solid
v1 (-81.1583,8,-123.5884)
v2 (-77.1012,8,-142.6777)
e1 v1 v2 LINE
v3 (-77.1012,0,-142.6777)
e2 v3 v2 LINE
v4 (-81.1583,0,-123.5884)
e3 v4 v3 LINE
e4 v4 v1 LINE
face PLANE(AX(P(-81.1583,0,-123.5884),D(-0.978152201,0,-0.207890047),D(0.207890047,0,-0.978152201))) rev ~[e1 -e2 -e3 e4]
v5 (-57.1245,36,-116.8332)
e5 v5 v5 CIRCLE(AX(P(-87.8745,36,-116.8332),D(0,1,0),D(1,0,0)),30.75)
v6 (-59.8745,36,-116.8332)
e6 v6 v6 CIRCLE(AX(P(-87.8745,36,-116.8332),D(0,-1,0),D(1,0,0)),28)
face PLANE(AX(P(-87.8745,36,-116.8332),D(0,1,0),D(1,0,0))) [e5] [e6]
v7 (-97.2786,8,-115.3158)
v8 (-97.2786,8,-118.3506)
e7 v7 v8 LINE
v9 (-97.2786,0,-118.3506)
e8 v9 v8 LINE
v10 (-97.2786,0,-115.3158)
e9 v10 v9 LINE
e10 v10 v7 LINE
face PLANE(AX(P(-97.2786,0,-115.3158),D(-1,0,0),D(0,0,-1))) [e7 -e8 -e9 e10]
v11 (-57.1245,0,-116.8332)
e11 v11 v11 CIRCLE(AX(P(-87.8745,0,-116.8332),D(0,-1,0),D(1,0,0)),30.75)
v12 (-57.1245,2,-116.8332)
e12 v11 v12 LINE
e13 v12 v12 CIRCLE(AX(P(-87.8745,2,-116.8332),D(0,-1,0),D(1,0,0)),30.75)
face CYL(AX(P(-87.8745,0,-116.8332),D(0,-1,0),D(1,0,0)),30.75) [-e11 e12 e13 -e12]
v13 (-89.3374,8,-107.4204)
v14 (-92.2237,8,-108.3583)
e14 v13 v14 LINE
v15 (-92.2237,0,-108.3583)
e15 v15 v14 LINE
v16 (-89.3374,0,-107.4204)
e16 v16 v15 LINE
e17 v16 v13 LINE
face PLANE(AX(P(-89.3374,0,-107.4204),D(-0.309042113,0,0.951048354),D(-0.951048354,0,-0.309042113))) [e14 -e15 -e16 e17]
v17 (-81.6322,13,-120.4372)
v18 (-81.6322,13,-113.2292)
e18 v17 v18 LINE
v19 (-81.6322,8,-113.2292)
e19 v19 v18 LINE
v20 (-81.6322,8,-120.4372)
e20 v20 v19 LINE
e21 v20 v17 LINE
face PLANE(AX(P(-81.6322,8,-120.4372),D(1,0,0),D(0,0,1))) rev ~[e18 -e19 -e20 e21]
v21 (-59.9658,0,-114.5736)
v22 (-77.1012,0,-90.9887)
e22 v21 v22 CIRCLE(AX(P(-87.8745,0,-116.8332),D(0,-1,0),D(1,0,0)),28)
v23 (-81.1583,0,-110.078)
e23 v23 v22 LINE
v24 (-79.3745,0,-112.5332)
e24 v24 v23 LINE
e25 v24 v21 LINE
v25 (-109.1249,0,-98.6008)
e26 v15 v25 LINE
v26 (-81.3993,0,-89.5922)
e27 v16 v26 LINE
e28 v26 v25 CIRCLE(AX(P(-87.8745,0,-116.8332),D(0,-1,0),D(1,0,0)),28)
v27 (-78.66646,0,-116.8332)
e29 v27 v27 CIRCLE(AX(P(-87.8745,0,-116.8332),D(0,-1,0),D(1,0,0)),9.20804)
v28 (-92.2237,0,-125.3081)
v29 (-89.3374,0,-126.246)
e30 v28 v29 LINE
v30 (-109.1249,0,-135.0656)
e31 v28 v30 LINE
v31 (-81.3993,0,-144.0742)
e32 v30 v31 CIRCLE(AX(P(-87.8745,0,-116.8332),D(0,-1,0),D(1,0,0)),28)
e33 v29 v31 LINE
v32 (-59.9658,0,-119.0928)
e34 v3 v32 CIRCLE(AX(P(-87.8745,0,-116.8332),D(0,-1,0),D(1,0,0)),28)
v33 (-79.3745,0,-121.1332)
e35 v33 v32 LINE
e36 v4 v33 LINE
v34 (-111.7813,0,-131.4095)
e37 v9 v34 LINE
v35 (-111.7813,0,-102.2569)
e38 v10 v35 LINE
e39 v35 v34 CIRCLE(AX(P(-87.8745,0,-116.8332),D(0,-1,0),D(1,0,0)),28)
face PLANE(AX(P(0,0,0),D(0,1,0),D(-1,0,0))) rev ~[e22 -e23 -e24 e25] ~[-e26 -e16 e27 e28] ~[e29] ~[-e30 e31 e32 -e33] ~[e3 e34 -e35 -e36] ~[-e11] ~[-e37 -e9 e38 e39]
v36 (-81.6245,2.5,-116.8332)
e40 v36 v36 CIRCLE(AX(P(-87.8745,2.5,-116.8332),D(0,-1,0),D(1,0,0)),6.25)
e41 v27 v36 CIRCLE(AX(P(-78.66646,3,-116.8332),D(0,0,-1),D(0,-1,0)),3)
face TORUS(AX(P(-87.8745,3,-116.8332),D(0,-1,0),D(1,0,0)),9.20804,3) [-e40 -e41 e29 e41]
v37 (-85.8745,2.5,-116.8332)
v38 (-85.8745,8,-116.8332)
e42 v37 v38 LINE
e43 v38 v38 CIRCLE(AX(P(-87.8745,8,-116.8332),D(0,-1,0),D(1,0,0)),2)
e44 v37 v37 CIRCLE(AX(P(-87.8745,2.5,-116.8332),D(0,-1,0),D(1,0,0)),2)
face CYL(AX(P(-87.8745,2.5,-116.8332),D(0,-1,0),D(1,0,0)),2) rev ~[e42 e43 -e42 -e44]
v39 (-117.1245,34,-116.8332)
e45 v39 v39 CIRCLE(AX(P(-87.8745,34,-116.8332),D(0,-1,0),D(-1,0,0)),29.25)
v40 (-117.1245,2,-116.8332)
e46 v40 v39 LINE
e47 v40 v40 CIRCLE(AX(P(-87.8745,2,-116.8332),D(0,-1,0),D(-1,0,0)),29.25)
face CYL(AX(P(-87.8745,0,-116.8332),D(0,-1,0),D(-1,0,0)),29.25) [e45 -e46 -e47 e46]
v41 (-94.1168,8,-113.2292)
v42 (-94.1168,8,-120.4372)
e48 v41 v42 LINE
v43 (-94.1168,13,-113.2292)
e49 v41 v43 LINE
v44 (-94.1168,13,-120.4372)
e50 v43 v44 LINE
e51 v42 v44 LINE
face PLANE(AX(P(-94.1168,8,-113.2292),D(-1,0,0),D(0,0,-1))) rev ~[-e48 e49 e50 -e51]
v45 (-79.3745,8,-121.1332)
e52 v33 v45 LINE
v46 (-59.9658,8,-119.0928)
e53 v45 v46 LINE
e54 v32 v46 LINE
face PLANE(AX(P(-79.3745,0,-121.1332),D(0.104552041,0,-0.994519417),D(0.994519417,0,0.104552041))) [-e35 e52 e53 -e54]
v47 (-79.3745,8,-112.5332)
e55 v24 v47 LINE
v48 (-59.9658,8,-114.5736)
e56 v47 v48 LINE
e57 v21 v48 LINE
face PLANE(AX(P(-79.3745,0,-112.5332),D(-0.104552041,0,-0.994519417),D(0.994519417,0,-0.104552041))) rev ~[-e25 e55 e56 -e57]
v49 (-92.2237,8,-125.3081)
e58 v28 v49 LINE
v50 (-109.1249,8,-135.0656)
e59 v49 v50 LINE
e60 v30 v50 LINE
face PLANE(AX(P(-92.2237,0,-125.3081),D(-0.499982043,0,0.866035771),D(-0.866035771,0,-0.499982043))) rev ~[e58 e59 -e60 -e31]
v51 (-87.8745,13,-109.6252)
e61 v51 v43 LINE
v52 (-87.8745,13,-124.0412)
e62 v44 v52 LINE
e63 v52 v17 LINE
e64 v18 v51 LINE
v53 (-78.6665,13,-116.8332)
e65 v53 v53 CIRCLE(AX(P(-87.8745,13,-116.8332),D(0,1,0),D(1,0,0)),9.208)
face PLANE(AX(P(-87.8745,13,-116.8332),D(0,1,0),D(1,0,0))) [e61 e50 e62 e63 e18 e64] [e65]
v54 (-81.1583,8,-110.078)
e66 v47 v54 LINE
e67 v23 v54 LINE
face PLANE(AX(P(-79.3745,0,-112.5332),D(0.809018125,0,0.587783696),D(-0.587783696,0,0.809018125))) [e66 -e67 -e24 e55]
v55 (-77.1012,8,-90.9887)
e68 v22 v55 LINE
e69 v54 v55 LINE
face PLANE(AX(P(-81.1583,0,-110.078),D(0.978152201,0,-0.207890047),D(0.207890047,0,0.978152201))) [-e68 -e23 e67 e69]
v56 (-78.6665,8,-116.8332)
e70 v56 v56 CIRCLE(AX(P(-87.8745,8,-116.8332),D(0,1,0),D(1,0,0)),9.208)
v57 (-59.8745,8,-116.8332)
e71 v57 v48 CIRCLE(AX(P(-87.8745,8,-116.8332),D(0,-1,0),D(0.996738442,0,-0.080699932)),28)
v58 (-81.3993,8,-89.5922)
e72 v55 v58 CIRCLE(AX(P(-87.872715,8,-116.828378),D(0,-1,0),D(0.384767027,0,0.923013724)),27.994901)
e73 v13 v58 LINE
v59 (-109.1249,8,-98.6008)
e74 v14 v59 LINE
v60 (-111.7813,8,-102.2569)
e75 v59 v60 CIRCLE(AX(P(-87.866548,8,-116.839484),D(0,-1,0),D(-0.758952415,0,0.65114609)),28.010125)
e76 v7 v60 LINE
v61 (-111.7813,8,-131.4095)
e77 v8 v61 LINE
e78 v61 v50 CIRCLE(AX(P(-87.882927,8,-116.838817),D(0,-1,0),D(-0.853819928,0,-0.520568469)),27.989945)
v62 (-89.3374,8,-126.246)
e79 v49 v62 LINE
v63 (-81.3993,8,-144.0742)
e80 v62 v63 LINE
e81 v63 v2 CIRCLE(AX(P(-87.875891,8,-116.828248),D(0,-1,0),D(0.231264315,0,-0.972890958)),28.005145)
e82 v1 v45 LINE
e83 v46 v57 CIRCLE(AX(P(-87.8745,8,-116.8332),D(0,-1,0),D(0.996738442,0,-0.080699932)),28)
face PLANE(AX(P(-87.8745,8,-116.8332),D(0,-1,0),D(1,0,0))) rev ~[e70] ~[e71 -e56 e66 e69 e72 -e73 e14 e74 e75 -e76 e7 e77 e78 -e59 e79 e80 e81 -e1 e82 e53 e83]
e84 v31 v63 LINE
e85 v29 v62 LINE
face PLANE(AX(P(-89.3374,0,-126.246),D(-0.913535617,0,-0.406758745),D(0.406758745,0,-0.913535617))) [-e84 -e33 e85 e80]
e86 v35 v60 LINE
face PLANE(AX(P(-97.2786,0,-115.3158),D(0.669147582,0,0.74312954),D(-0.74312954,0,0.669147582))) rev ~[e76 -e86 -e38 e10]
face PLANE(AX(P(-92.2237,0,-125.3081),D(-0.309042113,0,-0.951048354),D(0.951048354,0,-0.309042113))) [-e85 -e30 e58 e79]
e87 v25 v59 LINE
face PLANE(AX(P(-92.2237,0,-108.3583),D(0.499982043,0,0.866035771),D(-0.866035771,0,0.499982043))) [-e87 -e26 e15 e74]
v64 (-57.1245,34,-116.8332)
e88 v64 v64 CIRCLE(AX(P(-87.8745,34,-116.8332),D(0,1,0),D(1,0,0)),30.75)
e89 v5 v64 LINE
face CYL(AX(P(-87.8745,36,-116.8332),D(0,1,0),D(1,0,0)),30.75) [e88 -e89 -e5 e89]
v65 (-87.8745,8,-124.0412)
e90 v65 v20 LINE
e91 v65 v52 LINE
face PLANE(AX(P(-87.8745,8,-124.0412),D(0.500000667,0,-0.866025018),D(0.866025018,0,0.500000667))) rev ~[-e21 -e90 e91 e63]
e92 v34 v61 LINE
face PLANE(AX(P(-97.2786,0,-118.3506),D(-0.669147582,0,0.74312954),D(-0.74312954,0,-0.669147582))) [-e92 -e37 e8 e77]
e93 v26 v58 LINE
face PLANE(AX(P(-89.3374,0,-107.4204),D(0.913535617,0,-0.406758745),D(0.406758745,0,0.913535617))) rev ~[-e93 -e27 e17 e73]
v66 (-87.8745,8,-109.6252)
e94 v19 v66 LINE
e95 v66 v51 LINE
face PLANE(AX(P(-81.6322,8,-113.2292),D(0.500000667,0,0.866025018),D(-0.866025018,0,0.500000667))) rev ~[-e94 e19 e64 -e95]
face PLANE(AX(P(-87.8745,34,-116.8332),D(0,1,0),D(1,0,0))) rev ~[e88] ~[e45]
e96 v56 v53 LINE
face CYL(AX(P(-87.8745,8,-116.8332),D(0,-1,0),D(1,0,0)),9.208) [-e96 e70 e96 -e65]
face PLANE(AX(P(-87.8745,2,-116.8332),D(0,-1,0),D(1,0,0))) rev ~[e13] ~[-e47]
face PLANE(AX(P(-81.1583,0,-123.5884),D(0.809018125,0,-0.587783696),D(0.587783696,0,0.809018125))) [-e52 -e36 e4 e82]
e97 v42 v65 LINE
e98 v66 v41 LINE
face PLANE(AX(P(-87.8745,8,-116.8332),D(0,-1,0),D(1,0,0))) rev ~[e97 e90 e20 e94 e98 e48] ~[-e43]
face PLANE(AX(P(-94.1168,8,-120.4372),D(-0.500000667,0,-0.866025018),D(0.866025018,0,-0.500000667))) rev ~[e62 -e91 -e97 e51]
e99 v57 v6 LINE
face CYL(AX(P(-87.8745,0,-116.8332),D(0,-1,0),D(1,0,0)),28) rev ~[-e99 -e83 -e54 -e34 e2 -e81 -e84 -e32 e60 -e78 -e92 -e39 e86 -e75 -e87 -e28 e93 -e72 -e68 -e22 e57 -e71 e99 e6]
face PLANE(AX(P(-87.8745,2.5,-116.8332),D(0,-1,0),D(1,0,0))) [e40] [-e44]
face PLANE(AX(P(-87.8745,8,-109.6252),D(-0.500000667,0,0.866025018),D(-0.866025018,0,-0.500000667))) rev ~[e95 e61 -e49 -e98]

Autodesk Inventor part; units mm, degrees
ref_plane "YZ Plane" through (0, 0, 0) normal (1, 0, 0) x (0, 1, 0)
ref_plane "XZ Plane" through (0, 0, 0) normal (0, 1, 0) x (-1, 0, 0)
ref_plane "XY Plane" through (0, 0, 0) normal (0, 0, 1) x (1, 0, 0)
sketch "Sketch4" plane through (0, 0, 0) normal (0, 1, 0) x (-1, 0, 0)
  circle A0 centre (87.8745, -116.8332) radius 29.25
  point P0 (0, 0)
  dimension "d11" = 58.5
extrude "Extrusion4" add sketch "Sketch4" along normal blind 36
sketch "Sketch6" plane through (-87.8745, 0, -116.8332) normal (0, -1, 0) x (1, 0, 0)
  circle A0 centre (0, 0) radius 30.75
  point P0 (87.8745, 116.8332)
  dimension "d20" = 61.5
extrude "Extrusion6" add sketch "Sketch6" against normal blind 2
sketch "Sketch7" plane through (-87.8745, 36, -116.8332) normal (0, 1, 0) x (1, 0, 0)
  circle A0 centre (0, 0) radius 30.75
  point P0 (87.8745, -116.8332)
  dimension "d23" = 61.5
extrude "Extrusion7" add sketch "Sketch7" against normal blind 2
sketch "Sketch5" plane through (-87.8745, 0, -116.8332) normal (0, -1, 0) x (1, 0, 0)
  circle A0 centre (0, 0) radius 28
  circle A1 centre (0, 0) radius 29.25 projected
  point P0 (87.8745, 116.8332)
  dimension "d16" = 0
  dimension "d17" = 0
  dimension "d26" = 56
extrude "Extrusion5" cut sketch "Sketch5" against normal blind 36 contours A0
sketch "Sketch8" plane through (-87.8745, 0, -116.8332) normal (0, -1, 0) x (1, 0, 0)
  circle A0 centre (0, 0) radius 8.5
  circle A1 centre (0, 0) radius 28 projected
  line L0 (28, 0) -> (28, 2.25)
  line L1 (28, 0) -> (28, -2.25)
  line L2 (8.5, 0) -> (8.5, 4.3)
  line L3 (8.5, 0) -> (8.5, -4.3)
  line L4 (8.5, 4.3) -> (28, 2.25)
  line L5 (8.5, -4.3) -> (28, -2.25)
  arc A2 (27.9087, -2.2596) -> (27.9087, 2.2596) centre (0, 0) ccw
  line L6 (-1.4629, 9.4128) -> (6.5126, 27.3249)
  line L7 (2.6266, 8.084) -> (-1.4629, 9.4128)
  line L8 (2.6266, 8.084) -> (6.7162, 6.7552)
  line L9 (6.7162, 6.7552) -> (10.7924, 25.9343)
  arc A3 (10.7733, 25.8445) -> (6.4752, 27.241) centre (0, 0) ccw
  line L10 (-9.4041, 1.5174) -> (-23.975, 14.6377)
  line L11 (-6.8766, 4.9962) -> (-9.4041, 1.5174)
  line L12 (-6.8766, 4.9962) -> (-4.3492, 8.4749)
  line L13 (-4.3492, 8.4749) -> (-21.33, 18.2783)
  arc A4 (-21.2504, 18.2324) -> (-23.9068, 14.5763) centre (0, 0) ccw
  line L14 (-4.3492, -8.4749) -> (-21.33, -18.2783)
  line L15 (-6.8766, -4.9962) -> (-4.3492, -8.4749)
  line L16 (-6.8766, -4.9962) -> (-9.4041, -1.5174)
  line L17 (-9.4041, -1.5174) -> (-23.975, -14.6377)
  arc A5 (-23.9068, -14.5763) -> (-21.2504, -18.2324) centre (0, 0) ccw
  line L18 (6.7162, -6.7552) -> (10.7924, -25.9343)
  line L19 (2.6266, -8.084) -> (6.7162, -6.7552)
  line L20 (2.6266, -8.084) -> (-1.4629, -9.4128)
  line L21 (-1.4629, -9.4128) -> (6.5126, -27.3249)
  arc A6 (6.4752, -27.241) -> (10.7733, -25.8445) centre (0, 0) ccw
  line L22 (-1.4629, 9.4128) -> (-4.3492, 8.4749)
  line L23 (-9.4041, 1.5174) -> (-9.4041, -1.5174)
  line L24 (-4.3492, -8.4749) -> (-1.4629, -9.4128)
  line L25 (6.7162, -6.7552) -> (8.5, -4.3)
  line L26 (8.5, 4.3) -> (6.7162, 6.7552)
  line L27 (6.7162, 6.7552) -> (-1.4629, 9.4128)
  line L28 (-4.3492, 8.4749) -> (-9.4041, 1.5174)
  line L29 (-9.4041, -1.5174) -> (-4.3492, -8.4749)
  line L30 (-1.4629, -9.4128) -> (6.7162, -6.7552)
  line L31 (8.5, -4.3) -> (8.5, 4.3)
  point P0 (87.8745, 116.8332)
  point P1 (8.6525, 26.6296)
  point P2 (-22.6525, 16.458)
  point P3 (-22.6525, -16.458)
  point P4 (8.6525, -26.6296)
  dimension "d27" = 17
  dimension "d29" = 2.25
  dimension "d30" = 2.25
  dimension "d31" = 4.3
  dimension "d32" = 4.3
  dimension "d35" = 360
extrude "Extrusion8" add sketch "Sketch8" against normal blind 8 contours A0 | L3 L25 L19 A0 | A0 L8 L26 L2 | L2 L4 A1 L5 L3 | A0 L12 L22 L7 | L7 L6 A1 L9 L8 | L20 L24 L15 A0 | L19 L18 A1 L21 L20 | A0 L16 L23 L11 | L11 L10 A1 L13 L12 | L15 L14 A1 L17 L16
sketch "Sketch9" plane through (-87.8745, 0, -116.8332) normal (0, -1, 0) x (1, 0, 0)
  circle A0 centre (0, 0) radius 6.25
  point P0 (87.8745, 116.8332)
  dimension "d39" = 12.5
extrude "Extrusion9" cut sketch "Sketch9" against normal blind 2.5
fillet "Fillet1" radius 3 1 edges at (-94.1245, 0, -116.8332)
sketch "Sketch10" plane through (-87.8745, 2.5, -116.8332) normal (0, -1, 0) x (1, 0, 0)
  circle A0 centre (0, 0) radius 2
  point P0 (87.8745, 116.8332)
  dimension "d43" = 4
extrude "Extrusion10" cut sketch "Sketch10" against normal blind 50
sketch "Sketch11" plane through (-87.8745, 8, -116.8332) normal (0, 1, 0) x (1, 0, 0)
  circle A0 centre (0, 0) radius 9.208
  circle A1 centre (0, 0) radius 2 projected
  circle A2 centre (0, 0) radius 7.208
  circle A3 centre (0, 0) radius 9.208 projected
  line L0 (0, 7.208) -> (6.2423, 3.604)
  line L1 (6.2423, 3.604) -> (6.2423, -3.604)
  line L2 (6.2423, -3.604) -> (0, -7.208)
  line L3 (0, -7.208) -> (-6.2423, -3.604)
  line L4 (-6.2423, -3.604) -> (-6.2423, 3.604)
  line L5 (-6.2423, 3.604) -> (0, 7.208)
  point P0 (87.8745, -116.8332)
  dimension "d46" = 2
  dimension "d47" = 0
  dimension "d48" = 0
  dimension "d49" = 0
extrude "Extrusion11" add sketch "Sketch11" along normal blind 5 contours A0 | A2 L1 | L0 A2 | A2 L2 | L5 A2 | A2 L3 | L4 A2
equation "\"d30\" = d29"
equation "\"d32\" = d31"
properties part number "koleso" material "ABS Plastic"
